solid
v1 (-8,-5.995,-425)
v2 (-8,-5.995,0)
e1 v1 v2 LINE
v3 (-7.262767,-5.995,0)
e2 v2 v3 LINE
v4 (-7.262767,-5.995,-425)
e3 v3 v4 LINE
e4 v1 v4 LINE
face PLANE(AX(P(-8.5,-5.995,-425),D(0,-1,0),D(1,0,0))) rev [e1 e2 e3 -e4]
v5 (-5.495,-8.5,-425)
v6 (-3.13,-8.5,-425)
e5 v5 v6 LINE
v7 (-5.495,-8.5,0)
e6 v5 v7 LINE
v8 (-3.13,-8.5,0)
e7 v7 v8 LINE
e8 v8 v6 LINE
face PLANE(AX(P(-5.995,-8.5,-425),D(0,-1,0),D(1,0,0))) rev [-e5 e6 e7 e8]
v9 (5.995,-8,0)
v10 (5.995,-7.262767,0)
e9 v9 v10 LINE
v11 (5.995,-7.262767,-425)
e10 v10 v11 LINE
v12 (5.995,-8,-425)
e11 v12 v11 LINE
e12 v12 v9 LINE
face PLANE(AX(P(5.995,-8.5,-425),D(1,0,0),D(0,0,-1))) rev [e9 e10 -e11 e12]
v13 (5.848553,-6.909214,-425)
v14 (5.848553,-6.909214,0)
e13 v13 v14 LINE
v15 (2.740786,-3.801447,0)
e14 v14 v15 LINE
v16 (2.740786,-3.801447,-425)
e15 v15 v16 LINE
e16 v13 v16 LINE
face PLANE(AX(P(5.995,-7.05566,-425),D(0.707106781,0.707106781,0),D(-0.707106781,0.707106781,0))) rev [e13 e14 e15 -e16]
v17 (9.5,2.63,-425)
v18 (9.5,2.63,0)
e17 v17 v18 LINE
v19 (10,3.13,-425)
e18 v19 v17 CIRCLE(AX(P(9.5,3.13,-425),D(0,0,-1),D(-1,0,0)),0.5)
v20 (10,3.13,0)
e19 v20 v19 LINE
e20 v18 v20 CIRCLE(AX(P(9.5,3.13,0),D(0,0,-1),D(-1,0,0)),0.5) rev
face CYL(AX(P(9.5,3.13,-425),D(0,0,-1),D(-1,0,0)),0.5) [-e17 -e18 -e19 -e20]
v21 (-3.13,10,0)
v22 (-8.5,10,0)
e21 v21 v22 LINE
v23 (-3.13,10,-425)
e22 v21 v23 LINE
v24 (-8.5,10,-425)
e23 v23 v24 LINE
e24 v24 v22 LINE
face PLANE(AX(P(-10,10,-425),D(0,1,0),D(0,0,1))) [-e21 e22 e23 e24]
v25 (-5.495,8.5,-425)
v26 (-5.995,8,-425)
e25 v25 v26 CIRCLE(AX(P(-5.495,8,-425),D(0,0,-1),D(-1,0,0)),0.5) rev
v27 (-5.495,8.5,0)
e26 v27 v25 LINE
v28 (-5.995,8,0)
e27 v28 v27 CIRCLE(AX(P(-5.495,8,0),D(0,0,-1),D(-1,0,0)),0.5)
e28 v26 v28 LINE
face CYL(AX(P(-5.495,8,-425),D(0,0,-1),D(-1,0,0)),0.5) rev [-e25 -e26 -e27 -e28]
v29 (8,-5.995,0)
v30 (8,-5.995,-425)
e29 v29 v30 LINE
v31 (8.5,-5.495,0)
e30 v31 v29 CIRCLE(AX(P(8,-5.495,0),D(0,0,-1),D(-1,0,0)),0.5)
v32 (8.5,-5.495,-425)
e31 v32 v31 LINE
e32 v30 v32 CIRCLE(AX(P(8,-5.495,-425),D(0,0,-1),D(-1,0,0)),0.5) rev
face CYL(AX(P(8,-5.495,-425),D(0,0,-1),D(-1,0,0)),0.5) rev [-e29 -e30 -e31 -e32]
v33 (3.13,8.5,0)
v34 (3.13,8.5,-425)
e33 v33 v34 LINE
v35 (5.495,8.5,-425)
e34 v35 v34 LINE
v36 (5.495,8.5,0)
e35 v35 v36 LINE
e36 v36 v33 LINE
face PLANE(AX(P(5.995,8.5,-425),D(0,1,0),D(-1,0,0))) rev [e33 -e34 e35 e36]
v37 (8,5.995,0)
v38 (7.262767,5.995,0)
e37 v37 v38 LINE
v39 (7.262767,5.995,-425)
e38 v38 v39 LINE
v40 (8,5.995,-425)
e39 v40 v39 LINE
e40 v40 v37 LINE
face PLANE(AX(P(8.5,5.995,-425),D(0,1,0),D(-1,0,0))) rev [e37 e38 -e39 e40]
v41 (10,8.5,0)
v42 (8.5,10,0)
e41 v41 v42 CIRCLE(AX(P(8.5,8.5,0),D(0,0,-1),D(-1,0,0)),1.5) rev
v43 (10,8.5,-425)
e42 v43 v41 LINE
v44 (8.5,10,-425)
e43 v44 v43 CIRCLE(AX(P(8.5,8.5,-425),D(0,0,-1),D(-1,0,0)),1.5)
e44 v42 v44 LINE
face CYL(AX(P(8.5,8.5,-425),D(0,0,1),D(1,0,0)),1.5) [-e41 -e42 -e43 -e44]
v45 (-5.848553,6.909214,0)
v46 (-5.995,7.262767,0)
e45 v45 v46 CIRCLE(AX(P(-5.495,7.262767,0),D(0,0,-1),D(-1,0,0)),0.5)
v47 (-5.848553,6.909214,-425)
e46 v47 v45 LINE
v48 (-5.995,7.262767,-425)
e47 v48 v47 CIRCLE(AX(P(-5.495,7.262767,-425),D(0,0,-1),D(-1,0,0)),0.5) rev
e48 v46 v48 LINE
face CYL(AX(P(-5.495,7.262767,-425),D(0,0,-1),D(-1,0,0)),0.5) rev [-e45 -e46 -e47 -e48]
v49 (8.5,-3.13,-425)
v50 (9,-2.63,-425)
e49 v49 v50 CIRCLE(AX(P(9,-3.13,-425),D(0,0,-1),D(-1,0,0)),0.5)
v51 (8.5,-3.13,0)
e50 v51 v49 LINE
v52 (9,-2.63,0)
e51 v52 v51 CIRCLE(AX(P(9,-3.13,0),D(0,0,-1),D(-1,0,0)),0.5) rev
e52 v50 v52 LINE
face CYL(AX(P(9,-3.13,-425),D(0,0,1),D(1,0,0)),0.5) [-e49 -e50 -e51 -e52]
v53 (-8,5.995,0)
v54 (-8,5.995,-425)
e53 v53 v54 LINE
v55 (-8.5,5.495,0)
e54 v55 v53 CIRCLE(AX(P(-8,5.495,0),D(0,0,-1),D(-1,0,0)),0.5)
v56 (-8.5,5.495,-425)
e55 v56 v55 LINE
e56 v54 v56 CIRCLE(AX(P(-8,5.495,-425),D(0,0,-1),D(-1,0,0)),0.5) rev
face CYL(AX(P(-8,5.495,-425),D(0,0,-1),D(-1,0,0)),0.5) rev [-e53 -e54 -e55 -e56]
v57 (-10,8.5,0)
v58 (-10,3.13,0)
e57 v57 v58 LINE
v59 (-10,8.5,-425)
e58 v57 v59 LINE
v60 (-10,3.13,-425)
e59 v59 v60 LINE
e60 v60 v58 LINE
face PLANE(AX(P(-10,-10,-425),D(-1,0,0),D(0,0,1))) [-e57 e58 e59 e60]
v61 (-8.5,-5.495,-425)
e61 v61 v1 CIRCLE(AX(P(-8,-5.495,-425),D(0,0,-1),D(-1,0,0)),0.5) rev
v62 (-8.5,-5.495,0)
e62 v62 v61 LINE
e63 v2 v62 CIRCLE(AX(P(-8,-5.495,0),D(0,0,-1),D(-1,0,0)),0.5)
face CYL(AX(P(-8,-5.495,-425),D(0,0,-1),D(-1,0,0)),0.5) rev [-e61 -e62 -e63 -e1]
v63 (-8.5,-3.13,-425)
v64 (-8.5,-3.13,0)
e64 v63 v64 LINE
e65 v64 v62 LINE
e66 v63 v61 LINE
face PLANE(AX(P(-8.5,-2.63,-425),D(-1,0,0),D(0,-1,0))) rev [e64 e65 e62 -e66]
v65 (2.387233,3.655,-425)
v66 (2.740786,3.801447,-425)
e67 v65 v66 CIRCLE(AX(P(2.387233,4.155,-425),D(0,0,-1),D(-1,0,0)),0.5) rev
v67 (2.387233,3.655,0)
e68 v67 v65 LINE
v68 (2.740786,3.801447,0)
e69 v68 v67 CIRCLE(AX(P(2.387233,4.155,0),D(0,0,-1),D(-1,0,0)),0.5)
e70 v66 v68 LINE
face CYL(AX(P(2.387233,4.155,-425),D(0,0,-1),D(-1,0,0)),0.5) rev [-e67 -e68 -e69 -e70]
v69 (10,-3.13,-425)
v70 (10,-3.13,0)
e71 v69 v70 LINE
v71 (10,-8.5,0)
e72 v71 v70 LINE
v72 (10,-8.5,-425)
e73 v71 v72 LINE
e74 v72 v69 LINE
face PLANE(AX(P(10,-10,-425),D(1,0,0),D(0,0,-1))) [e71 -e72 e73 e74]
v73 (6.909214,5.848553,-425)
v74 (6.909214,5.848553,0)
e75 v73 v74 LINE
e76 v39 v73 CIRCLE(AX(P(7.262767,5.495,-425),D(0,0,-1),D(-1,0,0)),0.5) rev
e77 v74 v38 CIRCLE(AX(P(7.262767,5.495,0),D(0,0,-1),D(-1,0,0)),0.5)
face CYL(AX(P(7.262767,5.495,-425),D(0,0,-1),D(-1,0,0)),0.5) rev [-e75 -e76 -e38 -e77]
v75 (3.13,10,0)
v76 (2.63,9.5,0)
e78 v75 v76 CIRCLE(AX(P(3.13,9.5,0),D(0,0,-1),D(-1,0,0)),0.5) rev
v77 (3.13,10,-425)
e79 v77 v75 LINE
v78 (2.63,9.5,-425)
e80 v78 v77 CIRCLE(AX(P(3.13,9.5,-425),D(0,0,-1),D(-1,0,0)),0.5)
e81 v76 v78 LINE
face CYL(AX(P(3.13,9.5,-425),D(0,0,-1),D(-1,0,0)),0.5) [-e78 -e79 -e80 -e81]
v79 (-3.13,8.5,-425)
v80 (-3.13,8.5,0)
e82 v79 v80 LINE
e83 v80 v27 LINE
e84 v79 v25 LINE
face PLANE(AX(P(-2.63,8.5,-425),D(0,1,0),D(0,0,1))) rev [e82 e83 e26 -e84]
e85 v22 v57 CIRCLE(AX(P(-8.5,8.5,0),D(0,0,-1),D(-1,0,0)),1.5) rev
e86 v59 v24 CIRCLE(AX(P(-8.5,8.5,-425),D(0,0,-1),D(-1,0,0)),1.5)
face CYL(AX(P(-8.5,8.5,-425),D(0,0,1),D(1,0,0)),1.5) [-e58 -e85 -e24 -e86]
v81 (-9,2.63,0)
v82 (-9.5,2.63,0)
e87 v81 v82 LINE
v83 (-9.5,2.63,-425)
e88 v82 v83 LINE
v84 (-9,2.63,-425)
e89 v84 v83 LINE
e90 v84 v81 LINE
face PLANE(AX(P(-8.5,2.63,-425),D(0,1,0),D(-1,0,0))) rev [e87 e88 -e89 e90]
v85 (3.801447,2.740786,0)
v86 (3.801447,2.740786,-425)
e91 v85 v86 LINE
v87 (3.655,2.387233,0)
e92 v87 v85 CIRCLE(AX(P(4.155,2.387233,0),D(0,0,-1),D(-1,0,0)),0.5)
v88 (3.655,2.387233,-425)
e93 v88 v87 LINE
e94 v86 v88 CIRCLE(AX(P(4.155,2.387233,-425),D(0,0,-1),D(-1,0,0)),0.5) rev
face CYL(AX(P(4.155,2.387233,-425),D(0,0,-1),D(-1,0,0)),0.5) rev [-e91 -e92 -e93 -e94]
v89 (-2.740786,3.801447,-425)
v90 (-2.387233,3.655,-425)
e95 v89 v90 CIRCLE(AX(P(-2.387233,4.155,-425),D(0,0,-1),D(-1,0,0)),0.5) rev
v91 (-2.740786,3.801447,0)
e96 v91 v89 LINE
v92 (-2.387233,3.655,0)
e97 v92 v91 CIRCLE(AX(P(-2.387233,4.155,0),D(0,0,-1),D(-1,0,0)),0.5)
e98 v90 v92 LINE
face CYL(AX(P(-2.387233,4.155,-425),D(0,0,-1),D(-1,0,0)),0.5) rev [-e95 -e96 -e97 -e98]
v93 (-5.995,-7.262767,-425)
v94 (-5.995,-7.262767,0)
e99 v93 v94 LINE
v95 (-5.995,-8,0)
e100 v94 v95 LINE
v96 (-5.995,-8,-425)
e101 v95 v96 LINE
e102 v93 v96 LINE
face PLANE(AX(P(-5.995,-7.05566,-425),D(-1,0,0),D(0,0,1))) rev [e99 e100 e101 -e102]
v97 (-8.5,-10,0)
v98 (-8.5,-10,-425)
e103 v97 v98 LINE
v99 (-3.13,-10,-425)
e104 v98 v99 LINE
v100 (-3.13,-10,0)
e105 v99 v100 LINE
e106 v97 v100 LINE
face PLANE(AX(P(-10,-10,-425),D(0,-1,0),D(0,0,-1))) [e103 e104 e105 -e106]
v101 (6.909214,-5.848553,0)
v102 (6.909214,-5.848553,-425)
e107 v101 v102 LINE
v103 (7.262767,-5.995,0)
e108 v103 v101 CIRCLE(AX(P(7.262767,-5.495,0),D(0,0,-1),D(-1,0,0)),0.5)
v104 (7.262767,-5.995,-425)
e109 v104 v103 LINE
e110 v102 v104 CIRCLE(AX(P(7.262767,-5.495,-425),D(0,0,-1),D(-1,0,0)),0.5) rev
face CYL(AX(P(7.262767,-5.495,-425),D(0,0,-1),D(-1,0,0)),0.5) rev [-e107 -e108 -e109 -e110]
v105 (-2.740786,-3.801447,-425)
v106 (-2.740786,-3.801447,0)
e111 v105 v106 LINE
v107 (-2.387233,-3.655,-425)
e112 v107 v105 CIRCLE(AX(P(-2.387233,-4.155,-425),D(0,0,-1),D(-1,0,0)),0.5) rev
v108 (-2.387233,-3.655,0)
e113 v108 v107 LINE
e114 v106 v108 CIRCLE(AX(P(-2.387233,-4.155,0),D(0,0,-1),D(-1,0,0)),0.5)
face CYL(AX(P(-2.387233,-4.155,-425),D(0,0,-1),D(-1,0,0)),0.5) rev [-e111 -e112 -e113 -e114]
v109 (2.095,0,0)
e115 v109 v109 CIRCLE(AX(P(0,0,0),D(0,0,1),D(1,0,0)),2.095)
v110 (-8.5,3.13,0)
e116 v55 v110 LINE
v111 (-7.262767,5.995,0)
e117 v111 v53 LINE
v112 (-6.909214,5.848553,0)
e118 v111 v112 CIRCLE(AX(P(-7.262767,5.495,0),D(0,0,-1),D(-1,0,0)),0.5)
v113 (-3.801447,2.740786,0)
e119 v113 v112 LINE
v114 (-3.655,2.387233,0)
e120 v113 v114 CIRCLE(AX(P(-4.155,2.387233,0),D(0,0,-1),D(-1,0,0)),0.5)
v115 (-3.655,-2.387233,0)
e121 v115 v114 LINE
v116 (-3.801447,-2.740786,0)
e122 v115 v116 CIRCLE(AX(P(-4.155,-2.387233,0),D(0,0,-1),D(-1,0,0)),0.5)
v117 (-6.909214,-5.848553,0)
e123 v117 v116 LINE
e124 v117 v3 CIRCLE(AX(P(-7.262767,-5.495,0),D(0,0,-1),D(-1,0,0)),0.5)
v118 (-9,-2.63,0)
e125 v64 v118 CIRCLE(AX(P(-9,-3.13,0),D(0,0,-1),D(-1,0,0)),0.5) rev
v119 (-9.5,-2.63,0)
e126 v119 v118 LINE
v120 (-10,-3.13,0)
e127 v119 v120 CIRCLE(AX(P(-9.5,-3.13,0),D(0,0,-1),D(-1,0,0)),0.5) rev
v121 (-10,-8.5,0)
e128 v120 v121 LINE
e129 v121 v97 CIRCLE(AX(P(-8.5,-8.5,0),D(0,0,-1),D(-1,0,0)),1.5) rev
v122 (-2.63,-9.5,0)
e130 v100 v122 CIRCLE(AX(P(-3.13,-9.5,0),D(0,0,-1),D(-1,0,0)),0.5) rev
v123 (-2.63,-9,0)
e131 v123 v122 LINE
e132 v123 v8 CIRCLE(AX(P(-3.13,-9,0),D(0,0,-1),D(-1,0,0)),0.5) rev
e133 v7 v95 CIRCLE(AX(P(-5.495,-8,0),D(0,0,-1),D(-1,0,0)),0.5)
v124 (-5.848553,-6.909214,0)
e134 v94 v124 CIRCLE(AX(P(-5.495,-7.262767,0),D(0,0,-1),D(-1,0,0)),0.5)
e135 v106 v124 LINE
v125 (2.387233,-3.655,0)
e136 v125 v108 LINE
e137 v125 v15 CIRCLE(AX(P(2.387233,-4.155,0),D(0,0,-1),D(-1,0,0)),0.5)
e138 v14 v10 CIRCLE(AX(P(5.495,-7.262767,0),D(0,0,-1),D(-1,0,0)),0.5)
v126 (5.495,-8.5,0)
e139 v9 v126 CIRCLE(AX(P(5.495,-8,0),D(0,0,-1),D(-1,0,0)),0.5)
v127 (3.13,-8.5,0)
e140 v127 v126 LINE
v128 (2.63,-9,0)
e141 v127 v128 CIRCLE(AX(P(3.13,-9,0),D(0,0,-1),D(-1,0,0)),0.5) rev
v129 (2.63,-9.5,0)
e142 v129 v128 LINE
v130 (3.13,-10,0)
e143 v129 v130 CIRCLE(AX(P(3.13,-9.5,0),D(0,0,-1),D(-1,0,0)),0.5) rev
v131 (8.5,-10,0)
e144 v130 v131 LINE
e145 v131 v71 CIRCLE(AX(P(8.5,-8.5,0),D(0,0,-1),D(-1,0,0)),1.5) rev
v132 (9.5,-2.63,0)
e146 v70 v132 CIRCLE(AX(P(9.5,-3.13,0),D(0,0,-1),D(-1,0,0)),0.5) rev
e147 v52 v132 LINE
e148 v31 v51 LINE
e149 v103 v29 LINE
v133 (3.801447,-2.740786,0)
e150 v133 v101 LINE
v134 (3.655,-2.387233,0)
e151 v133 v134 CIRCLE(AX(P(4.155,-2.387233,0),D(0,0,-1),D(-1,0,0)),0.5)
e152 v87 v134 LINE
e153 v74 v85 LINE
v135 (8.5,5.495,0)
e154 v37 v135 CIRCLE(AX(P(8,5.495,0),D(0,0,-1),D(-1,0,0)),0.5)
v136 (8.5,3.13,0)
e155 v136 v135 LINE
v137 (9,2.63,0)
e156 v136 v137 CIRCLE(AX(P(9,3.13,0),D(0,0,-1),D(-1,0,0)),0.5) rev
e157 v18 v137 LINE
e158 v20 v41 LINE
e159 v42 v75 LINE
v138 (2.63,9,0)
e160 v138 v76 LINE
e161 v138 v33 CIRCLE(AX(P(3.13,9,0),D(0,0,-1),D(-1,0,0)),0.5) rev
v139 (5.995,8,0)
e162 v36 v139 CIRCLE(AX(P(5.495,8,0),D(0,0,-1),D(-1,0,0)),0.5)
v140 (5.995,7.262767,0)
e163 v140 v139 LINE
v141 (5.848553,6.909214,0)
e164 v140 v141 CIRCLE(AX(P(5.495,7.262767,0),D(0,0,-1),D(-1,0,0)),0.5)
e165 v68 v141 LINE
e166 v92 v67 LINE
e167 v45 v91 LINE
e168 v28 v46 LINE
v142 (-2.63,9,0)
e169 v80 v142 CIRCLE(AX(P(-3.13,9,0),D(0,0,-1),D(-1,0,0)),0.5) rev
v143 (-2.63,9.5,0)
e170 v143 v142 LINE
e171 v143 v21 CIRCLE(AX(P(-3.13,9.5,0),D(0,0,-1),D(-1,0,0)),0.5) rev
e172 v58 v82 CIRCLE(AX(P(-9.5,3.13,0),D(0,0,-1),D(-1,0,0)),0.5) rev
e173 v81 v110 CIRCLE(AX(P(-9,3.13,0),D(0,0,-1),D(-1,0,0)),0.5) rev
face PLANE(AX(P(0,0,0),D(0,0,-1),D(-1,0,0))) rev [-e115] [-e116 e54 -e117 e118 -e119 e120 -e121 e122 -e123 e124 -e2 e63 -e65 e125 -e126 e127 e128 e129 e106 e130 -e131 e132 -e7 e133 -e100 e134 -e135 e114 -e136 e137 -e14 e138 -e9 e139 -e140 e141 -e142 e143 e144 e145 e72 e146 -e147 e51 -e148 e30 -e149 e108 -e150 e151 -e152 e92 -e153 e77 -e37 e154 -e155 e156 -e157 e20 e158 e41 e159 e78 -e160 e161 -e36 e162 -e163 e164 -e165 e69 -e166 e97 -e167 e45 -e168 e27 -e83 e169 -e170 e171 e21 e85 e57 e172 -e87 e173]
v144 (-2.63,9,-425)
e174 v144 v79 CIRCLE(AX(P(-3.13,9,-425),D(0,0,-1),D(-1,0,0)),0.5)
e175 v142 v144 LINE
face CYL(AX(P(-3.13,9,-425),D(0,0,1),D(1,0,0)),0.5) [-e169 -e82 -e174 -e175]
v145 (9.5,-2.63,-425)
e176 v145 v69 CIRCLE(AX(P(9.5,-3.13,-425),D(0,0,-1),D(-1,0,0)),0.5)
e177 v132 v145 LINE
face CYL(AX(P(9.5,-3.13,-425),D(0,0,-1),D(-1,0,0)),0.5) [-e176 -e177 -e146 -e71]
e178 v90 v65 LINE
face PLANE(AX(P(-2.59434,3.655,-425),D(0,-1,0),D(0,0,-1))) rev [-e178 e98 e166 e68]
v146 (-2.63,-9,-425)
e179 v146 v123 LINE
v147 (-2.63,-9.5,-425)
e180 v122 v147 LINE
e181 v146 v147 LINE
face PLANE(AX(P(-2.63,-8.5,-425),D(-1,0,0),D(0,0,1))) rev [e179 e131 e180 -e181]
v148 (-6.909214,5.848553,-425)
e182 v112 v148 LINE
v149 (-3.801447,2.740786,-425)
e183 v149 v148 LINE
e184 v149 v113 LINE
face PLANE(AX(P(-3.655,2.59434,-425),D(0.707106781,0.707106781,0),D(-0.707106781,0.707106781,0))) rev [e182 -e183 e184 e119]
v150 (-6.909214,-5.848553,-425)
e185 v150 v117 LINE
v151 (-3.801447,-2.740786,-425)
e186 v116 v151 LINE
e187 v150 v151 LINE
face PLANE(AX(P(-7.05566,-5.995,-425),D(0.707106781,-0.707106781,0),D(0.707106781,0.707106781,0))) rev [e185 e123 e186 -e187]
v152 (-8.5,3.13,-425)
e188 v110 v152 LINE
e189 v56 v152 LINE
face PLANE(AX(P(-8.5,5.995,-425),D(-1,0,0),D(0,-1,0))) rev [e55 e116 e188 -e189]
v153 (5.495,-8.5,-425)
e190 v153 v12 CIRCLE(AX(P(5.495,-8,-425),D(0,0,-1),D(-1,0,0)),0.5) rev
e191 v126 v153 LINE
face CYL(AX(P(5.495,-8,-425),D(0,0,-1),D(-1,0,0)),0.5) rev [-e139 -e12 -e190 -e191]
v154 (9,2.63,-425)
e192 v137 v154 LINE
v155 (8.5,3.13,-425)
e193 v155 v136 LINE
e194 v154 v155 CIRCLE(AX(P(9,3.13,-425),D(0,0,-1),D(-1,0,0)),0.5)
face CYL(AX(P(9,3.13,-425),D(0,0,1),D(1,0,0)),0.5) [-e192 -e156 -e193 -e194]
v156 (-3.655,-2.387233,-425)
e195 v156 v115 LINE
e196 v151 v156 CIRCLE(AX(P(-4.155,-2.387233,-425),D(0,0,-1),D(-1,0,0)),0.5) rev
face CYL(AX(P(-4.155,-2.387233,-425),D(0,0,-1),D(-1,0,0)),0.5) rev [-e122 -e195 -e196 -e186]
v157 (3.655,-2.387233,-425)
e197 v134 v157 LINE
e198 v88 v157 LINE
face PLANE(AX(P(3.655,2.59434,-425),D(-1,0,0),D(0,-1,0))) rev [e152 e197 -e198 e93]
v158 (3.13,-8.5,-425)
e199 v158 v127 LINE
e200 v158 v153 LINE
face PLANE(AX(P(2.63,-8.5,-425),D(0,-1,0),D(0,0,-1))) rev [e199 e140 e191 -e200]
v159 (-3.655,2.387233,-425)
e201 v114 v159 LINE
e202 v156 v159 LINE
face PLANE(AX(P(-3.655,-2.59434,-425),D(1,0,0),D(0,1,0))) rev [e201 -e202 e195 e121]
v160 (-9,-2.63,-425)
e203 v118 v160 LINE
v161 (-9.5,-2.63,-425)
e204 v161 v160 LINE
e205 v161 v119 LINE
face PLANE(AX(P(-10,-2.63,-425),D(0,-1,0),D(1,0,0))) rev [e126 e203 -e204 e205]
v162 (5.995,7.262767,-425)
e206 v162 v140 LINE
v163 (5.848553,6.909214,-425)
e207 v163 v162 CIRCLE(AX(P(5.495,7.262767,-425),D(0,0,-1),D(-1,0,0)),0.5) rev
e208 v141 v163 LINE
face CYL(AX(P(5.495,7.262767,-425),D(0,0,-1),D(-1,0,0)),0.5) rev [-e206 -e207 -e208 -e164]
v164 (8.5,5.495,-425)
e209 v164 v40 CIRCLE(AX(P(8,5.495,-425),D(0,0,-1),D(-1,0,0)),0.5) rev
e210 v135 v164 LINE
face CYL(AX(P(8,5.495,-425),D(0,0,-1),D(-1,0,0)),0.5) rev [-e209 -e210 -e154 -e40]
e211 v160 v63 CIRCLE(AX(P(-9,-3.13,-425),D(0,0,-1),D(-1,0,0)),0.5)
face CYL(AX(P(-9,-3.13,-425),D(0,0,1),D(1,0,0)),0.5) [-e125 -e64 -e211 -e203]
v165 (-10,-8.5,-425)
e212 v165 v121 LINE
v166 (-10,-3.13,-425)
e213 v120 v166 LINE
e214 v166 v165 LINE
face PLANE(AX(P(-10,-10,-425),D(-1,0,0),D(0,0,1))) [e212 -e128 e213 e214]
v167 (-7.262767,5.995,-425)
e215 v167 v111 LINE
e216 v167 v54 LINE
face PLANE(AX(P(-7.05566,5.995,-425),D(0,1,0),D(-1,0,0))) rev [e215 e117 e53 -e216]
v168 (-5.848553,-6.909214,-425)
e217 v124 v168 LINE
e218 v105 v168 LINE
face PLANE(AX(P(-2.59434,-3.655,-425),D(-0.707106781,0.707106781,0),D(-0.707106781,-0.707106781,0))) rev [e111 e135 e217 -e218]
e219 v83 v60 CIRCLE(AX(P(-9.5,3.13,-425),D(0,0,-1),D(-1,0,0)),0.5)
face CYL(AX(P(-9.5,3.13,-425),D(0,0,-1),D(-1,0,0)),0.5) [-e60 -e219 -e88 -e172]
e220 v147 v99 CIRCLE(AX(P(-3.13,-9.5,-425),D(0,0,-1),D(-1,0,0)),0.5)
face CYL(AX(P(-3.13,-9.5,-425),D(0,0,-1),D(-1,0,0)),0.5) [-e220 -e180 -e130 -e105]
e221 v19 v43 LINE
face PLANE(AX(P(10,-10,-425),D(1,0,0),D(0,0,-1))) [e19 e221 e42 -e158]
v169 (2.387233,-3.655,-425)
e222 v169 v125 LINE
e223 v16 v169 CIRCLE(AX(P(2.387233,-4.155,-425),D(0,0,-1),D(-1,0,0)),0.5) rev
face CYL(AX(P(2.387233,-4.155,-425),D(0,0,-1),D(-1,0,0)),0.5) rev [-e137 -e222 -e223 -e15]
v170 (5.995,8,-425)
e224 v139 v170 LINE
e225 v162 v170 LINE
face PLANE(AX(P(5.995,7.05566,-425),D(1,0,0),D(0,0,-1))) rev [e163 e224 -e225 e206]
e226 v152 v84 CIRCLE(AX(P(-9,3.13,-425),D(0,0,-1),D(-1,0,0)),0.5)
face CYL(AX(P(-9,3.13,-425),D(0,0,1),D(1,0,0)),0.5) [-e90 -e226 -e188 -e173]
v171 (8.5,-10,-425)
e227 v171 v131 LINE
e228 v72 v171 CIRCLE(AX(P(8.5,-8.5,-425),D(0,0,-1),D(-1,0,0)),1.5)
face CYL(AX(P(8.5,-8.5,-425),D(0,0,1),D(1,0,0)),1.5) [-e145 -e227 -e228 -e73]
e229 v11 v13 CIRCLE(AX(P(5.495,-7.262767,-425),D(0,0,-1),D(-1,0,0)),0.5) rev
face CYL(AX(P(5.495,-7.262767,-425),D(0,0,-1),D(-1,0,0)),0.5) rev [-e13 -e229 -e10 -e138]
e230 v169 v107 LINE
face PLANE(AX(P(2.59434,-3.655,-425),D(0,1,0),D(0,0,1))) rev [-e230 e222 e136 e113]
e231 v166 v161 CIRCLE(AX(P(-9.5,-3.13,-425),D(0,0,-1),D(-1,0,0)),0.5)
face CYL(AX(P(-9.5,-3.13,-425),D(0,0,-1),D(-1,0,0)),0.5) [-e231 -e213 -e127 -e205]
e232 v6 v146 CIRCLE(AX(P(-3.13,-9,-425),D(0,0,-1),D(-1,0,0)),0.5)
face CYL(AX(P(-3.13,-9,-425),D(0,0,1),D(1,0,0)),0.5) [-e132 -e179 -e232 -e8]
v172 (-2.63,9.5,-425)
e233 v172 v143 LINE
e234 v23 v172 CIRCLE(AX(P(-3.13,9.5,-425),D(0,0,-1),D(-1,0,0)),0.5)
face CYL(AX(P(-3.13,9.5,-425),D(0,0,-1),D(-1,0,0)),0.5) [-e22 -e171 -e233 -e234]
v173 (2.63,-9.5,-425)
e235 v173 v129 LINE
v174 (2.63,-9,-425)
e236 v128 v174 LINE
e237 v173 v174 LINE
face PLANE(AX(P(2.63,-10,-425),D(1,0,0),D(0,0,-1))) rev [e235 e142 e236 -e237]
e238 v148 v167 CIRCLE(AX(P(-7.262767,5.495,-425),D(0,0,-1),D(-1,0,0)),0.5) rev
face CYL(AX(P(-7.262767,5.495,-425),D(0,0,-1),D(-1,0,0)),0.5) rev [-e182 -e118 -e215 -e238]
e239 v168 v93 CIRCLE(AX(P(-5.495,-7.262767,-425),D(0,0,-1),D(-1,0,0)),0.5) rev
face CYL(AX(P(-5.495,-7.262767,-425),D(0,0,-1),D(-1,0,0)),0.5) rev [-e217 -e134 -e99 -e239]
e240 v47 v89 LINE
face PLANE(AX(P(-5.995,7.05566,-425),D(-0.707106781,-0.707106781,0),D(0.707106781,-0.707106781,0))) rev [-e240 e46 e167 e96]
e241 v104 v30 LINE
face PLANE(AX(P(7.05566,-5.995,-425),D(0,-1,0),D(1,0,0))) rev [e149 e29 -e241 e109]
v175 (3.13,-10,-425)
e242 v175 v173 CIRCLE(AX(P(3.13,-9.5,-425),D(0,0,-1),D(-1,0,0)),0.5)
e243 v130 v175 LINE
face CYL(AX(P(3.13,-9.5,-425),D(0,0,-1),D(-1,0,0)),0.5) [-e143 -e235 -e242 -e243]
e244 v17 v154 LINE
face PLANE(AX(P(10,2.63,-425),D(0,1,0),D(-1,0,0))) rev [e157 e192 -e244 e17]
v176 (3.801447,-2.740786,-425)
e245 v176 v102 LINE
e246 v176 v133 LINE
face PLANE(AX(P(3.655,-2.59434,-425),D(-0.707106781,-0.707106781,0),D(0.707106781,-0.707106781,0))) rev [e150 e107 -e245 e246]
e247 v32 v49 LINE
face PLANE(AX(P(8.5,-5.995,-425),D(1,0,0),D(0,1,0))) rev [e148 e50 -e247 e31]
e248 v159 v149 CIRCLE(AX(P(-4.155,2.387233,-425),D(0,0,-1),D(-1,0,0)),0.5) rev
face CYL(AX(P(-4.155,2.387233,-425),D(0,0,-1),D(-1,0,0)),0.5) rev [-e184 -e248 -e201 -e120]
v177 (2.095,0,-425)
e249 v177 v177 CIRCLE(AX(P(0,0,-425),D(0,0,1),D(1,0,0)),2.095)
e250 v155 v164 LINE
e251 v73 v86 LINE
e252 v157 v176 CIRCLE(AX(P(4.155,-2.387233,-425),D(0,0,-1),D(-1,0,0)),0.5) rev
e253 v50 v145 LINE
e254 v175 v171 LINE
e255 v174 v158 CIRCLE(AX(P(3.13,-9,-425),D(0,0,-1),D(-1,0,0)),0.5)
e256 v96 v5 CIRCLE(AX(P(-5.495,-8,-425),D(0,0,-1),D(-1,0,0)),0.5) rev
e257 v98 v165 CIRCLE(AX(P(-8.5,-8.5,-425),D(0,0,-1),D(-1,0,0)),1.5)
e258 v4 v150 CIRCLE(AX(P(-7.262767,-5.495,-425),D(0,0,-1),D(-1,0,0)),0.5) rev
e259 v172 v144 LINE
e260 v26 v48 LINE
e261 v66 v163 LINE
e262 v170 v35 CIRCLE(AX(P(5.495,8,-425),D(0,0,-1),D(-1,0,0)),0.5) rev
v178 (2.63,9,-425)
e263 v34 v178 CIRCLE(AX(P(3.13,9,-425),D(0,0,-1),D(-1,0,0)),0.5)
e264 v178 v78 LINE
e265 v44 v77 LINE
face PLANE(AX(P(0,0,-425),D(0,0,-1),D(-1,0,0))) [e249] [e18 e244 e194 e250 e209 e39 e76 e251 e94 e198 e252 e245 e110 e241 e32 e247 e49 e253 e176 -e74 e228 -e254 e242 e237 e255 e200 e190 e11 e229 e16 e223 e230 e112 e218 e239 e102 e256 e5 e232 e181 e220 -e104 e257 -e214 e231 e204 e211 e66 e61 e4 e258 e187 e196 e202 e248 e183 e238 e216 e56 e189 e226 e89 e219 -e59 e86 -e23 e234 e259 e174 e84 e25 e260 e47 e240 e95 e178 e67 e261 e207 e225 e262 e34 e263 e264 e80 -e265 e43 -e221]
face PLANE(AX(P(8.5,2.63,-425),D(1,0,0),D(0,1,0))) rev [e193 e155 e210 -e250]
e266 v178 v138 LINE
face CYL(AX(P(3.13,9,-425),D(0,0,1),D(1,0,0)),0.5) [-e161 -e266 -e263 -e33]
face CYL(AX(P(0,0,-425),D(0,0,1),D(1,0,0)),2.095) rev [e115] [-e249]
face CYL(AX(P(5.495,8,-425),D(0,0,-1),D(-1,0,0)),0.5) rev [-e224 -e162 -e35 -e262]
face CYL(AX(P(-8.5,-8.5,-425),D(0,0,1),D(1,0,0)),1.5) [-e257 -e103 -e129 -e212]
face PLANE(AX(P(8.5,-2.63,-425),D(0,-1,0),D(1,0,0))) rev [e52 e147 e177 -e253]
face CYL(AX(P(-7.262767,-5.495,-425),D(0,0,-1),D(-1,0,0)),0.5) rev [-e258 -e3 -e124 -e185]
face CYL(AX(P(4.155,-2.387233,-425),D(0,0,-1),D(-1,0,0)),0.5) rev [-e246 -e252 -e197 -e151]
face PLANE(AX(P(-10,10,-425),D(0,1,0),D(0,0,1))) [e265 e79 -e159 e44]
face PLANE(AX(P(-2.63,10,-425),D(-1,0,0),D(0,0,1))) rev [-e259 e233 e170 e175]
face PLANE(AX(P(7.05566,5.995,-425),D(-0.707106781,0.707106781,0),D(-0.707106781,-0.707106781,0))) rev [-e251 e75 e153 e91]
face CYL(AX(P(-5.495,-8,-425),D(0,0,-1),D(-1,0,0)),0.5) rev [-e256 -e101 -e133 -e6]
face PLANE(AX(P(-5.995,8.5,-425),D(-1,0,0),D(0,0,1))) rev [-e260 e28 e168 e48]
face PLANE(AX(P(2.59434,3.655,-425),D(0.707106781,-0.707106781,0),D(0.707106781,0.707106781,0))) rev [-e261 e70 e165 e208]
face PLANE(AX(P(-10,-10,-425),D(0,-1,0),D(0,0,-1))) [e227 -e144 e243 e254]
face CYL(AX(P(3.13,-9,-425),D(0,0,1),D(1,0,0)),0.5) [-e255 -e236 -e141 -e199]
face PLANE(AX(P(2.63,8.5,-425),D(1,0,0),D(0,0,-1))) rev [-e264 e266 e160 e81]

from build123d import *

# Parameters (mm, degrees)
SKETCH1_W           = 20
SKETCH1_H           = 20
BOSS_EXTRUDE1_DEPTH = 425
CUT_EXTRUDE1_DEPTH  = 426.23522902
FILLET1_R           = 0.5
CIRPATTERN1_START   = -425
CIRPATTERN1_DEPTH   = 425
FILLET2_R           = 1.5
SKETCH3_R           = 2.095
CUT_EXTRUDE2_DEPTH  = 426.23522902
FILLET3_R           = 0.5


# Read off the part's stored shape, not the designer's step: CirPattern1
with BuildPart() as part:
    # Sketch1 → Boss-Extrude1 (new body)
    with BuildSketch(Plane.XY):
        Rectangle(SKETCH1_W, SKETCH1_H)
    extrude(amount=-BOSS_EXTRUDE1_DEPTH)

    # Sketch2 → Cut-Extrude1 (cut, through all)
    with BuildSketch(Plane.XY):
        Polygon((0, 10), (-2.63, 10), (-2.63, 8.5), (-5.995, 8.5), (-5.995, 7.055660172), (-2.594339828, 3.655), (2.594339828, 3.655), (5.995, 7.055660172), (5.995, 8.5), (2.63, 8.5), (2.63, 10), align=None)
    extrude(amount=-CUT_EXTRUDE1_DEPTH, mode=Mode.SUBTRACT)

    # Fillet1
    fillet1_edges = [part.edges().sort_by_distance(p)[0] for p in [
        (2.63, 10, -212.5),
        (2.63, 8.5, -212.5),
        (5.995, 8.5, -212.5),
        (5.995, 7.055660172, -212.5),
        (2.594339828, 3.655, -212.5),
        (-2.594339828, 3.655, -212.5),
        (-5.995, 7.055660172, -212.5),
        (-5.995, 8.5, -212.5),
        (-2.63, 8.5, -212.5),
        (-2.63, 10, -212.5),
    ]]
    fillet(fillet1_edges, radius=FILLET1_R)

    # CirPattern1 outline → CirPattern1 (cut)
    with BuildSketch(Plane.XY.offset(CIRPATTERN1_START)):
        with BuildLine():
            Line((-2.63, -10), (2.63, -10))
            Line((2.63, -10), (2.63, -9))
            ThreePointArc((2.63, -9), (2.776446609, -8.646446609), (3.13, -8.5))
            Line((3.13, -8.5), (5.495, -8.5))
            ThreePointArc((5.495, -8.5), (5.848553391, -8.353553391), (5.995, -8))
            Line((5.995, -8), (5.995, -7.262766953))
            ThreePointArc((5.995, -7.262766953), (5.956939766, -7.071425237), (5.848553391, -6.909213562))
            Line((5.848553391, -6.909213562), (2.740786438, -3.801446609))
            ThreePointArc((2.740786438, -3.801446609), (2.578574763, -3.693060234), (2.387233047, -3.655))
            Line((2.387233047, -3.655), (-2.387233047, -3.655))
            ThreePointArc((-2.387233047, -3.655), (-2.578574763, -3.693060234), (-2.740786438, -3.801446609))
            Line((-2.740786438, -3.801446609), (-5.848553391, -6.909213562))
            ThreePointArc((-5.848553391, -6.909213562), (-5.956939766, -7.071425237), (-5.995, -7.262766953))
            Line((-5.995, -7.262766953), (-5.995, -8))
            ThreePointArc((-5.995, -8), (-5.848553391, -8.353553391), (-5.495, -8.5))
            Line((-5.495, -8.5), (-3.13, -8.5))
            ThreePointArc((-3.13, -8.5), (-2.776446609, -8.646446609), (-2.63, -9))
            Line((-2.63, -9), (-2.63, -10))
        make_face()
        with BuildLine():
            Line((-10, 2.63), (-10, -2.63))
            Line((-10, -2.63), (-9, -2.63))
            ThreePointArc((-9, -2.63), (-8.646446609, -2.776446609), (-8.5, -3.13))
            Line((-8.5, -3.13), (-8.5, -5.495))
            ThreePointArc((-8.5, -5.495), (-8.353553391, -5.848553391), (-8, -5.995))
            Line((-8, -5.995), (-7.262766953, -5.995))
            ThreePointArc((-7.262766953, -5.995), (-7.071425237, -5.956939766), (-6.909213562, -5.848553391))
            Line((-6.909213562, -5.848553391), (-3.801446609, -2.740786438))
            ThreePointArc((-3.801446609, -2.740786438), (-3.693060234, -2.578574763), (-3.655, -2.387233047))
            Line((-3.655, -2.387233047), (-3.655, 2.387233047))
            ThreePointArc((-3.655, 2.387233047), (-3.693060234, 2.578574763), (-3.801446609, 2.740786438))
            Line((-3.801446609, 2.740786438), (-6.909213562, 5.848553391))
            ThreePointArc((-6.909213562, 5.848553391), (-7.071425237, 5.956939766), (-7.262766953, 5.995))
            Line((-7.262766953, 5.995), (-8, 5.995))
            ThreePointArc((-8, 5.995), (-8.353553391, 5.848553391), (-8.5, 5.495))
            Line((-8.5, 5.495), (-8.5, 3.13))
            ThreePointArc((-8.5, 3.13), (-8.646446609, 2.776446609), (-9, 2.63))
            Line((-9, 2.63), (-10, 2.63))
        make_face()
        with BuildLine():
            Line((9, -2.63), (10, -2.63))
            Line((10, -2.63), (10, 2.63))
            Line((10, 2.63), (9, 2.63))
            ThreePointArc((9, 2.63), (8.646446609, 2.776446609), (8.5, 3.13))
            Line((8.5, 3.13), (8.5, 5.495))
            ThreePointArc((8.5, 5.495), (8.353553391, 5.848553391), (8, 5.995))
            Line((8, 5.995), (7.262766953, 5.995))
            ThreePointArc((7.262766953, 5.995), (7.071425237, 5.956939766), (6.909213562, 5.848553391))
            Line((6.909213562, 5.848553391), (3.801446609, 2.740786438))
            ThreePointArc((3.801446609, 2.740786438), (3.693060234, 2.578574763), (3.655, 2.387233047))
            Line((3.655, 2.387233047), (3.655, -2.387233047))
            ThreePointArc((3.655, -2.387233047), (3.693060234, -2.578574763), (3.801446609, -2.740786438))
            Line((3.801446609, -2.740786438), (6.909213562, -5.848553391))
            ThreePointArc((6.909213562, -5.848553391), (7.071425237, -5.956939766), (7.262766953, -5.995))
            Line((7.262766953, -5.995), (8, -5.995))
            ThreePointArc((8, -5.995), (8.353553391, -5.848553391), (8.5, -5.495))
            Line((8.5, -5.495), (8.5, -3.13))
            ThreePointArc((8.5, -3.13), (8.646446609, -2.776446609), (9, -2.63))
        make_face()
    extrude(amount=CIRPATTERN1_DEPTH, mode=Mode.SUBTRACT)

    # Fillet2
    fillet2_edges = [part.edges().sort_by_distance(p)[0] for p in [
        (10, -10, -212.5),
        (-10, -10, -212.5),
        (-10, 10, -212.5),
        (10, 10, -212.5),
    ]]
    fillet(fillet2_edges, radius=FILLET2_R)

    # Sketch3 → Cut-Extrude2 (cut, through all)
    with BuildSketch(Plane.XY):
        Circle(SKETCH3_R)
    extrude(amount=-CUT_EXTRUDE2_DEPTH, mode=Mode.SUBTRACT)

    # Fillet3
    fillet3_edges = [part.edges().sort_by_distance(p)[0] for p in [
        (-10, 2.63, -212.5),
        (-10, -2.63, -212.5),
        (-2.63, -10, -212.5),
        (2.63, -10, -212.5),
        (10, -2.63, -212.5),
        (10, 2.63, -212.5),
    ]]
    fillet(fillet3_edges, radius=FILLET3_R)


solid = part.part
